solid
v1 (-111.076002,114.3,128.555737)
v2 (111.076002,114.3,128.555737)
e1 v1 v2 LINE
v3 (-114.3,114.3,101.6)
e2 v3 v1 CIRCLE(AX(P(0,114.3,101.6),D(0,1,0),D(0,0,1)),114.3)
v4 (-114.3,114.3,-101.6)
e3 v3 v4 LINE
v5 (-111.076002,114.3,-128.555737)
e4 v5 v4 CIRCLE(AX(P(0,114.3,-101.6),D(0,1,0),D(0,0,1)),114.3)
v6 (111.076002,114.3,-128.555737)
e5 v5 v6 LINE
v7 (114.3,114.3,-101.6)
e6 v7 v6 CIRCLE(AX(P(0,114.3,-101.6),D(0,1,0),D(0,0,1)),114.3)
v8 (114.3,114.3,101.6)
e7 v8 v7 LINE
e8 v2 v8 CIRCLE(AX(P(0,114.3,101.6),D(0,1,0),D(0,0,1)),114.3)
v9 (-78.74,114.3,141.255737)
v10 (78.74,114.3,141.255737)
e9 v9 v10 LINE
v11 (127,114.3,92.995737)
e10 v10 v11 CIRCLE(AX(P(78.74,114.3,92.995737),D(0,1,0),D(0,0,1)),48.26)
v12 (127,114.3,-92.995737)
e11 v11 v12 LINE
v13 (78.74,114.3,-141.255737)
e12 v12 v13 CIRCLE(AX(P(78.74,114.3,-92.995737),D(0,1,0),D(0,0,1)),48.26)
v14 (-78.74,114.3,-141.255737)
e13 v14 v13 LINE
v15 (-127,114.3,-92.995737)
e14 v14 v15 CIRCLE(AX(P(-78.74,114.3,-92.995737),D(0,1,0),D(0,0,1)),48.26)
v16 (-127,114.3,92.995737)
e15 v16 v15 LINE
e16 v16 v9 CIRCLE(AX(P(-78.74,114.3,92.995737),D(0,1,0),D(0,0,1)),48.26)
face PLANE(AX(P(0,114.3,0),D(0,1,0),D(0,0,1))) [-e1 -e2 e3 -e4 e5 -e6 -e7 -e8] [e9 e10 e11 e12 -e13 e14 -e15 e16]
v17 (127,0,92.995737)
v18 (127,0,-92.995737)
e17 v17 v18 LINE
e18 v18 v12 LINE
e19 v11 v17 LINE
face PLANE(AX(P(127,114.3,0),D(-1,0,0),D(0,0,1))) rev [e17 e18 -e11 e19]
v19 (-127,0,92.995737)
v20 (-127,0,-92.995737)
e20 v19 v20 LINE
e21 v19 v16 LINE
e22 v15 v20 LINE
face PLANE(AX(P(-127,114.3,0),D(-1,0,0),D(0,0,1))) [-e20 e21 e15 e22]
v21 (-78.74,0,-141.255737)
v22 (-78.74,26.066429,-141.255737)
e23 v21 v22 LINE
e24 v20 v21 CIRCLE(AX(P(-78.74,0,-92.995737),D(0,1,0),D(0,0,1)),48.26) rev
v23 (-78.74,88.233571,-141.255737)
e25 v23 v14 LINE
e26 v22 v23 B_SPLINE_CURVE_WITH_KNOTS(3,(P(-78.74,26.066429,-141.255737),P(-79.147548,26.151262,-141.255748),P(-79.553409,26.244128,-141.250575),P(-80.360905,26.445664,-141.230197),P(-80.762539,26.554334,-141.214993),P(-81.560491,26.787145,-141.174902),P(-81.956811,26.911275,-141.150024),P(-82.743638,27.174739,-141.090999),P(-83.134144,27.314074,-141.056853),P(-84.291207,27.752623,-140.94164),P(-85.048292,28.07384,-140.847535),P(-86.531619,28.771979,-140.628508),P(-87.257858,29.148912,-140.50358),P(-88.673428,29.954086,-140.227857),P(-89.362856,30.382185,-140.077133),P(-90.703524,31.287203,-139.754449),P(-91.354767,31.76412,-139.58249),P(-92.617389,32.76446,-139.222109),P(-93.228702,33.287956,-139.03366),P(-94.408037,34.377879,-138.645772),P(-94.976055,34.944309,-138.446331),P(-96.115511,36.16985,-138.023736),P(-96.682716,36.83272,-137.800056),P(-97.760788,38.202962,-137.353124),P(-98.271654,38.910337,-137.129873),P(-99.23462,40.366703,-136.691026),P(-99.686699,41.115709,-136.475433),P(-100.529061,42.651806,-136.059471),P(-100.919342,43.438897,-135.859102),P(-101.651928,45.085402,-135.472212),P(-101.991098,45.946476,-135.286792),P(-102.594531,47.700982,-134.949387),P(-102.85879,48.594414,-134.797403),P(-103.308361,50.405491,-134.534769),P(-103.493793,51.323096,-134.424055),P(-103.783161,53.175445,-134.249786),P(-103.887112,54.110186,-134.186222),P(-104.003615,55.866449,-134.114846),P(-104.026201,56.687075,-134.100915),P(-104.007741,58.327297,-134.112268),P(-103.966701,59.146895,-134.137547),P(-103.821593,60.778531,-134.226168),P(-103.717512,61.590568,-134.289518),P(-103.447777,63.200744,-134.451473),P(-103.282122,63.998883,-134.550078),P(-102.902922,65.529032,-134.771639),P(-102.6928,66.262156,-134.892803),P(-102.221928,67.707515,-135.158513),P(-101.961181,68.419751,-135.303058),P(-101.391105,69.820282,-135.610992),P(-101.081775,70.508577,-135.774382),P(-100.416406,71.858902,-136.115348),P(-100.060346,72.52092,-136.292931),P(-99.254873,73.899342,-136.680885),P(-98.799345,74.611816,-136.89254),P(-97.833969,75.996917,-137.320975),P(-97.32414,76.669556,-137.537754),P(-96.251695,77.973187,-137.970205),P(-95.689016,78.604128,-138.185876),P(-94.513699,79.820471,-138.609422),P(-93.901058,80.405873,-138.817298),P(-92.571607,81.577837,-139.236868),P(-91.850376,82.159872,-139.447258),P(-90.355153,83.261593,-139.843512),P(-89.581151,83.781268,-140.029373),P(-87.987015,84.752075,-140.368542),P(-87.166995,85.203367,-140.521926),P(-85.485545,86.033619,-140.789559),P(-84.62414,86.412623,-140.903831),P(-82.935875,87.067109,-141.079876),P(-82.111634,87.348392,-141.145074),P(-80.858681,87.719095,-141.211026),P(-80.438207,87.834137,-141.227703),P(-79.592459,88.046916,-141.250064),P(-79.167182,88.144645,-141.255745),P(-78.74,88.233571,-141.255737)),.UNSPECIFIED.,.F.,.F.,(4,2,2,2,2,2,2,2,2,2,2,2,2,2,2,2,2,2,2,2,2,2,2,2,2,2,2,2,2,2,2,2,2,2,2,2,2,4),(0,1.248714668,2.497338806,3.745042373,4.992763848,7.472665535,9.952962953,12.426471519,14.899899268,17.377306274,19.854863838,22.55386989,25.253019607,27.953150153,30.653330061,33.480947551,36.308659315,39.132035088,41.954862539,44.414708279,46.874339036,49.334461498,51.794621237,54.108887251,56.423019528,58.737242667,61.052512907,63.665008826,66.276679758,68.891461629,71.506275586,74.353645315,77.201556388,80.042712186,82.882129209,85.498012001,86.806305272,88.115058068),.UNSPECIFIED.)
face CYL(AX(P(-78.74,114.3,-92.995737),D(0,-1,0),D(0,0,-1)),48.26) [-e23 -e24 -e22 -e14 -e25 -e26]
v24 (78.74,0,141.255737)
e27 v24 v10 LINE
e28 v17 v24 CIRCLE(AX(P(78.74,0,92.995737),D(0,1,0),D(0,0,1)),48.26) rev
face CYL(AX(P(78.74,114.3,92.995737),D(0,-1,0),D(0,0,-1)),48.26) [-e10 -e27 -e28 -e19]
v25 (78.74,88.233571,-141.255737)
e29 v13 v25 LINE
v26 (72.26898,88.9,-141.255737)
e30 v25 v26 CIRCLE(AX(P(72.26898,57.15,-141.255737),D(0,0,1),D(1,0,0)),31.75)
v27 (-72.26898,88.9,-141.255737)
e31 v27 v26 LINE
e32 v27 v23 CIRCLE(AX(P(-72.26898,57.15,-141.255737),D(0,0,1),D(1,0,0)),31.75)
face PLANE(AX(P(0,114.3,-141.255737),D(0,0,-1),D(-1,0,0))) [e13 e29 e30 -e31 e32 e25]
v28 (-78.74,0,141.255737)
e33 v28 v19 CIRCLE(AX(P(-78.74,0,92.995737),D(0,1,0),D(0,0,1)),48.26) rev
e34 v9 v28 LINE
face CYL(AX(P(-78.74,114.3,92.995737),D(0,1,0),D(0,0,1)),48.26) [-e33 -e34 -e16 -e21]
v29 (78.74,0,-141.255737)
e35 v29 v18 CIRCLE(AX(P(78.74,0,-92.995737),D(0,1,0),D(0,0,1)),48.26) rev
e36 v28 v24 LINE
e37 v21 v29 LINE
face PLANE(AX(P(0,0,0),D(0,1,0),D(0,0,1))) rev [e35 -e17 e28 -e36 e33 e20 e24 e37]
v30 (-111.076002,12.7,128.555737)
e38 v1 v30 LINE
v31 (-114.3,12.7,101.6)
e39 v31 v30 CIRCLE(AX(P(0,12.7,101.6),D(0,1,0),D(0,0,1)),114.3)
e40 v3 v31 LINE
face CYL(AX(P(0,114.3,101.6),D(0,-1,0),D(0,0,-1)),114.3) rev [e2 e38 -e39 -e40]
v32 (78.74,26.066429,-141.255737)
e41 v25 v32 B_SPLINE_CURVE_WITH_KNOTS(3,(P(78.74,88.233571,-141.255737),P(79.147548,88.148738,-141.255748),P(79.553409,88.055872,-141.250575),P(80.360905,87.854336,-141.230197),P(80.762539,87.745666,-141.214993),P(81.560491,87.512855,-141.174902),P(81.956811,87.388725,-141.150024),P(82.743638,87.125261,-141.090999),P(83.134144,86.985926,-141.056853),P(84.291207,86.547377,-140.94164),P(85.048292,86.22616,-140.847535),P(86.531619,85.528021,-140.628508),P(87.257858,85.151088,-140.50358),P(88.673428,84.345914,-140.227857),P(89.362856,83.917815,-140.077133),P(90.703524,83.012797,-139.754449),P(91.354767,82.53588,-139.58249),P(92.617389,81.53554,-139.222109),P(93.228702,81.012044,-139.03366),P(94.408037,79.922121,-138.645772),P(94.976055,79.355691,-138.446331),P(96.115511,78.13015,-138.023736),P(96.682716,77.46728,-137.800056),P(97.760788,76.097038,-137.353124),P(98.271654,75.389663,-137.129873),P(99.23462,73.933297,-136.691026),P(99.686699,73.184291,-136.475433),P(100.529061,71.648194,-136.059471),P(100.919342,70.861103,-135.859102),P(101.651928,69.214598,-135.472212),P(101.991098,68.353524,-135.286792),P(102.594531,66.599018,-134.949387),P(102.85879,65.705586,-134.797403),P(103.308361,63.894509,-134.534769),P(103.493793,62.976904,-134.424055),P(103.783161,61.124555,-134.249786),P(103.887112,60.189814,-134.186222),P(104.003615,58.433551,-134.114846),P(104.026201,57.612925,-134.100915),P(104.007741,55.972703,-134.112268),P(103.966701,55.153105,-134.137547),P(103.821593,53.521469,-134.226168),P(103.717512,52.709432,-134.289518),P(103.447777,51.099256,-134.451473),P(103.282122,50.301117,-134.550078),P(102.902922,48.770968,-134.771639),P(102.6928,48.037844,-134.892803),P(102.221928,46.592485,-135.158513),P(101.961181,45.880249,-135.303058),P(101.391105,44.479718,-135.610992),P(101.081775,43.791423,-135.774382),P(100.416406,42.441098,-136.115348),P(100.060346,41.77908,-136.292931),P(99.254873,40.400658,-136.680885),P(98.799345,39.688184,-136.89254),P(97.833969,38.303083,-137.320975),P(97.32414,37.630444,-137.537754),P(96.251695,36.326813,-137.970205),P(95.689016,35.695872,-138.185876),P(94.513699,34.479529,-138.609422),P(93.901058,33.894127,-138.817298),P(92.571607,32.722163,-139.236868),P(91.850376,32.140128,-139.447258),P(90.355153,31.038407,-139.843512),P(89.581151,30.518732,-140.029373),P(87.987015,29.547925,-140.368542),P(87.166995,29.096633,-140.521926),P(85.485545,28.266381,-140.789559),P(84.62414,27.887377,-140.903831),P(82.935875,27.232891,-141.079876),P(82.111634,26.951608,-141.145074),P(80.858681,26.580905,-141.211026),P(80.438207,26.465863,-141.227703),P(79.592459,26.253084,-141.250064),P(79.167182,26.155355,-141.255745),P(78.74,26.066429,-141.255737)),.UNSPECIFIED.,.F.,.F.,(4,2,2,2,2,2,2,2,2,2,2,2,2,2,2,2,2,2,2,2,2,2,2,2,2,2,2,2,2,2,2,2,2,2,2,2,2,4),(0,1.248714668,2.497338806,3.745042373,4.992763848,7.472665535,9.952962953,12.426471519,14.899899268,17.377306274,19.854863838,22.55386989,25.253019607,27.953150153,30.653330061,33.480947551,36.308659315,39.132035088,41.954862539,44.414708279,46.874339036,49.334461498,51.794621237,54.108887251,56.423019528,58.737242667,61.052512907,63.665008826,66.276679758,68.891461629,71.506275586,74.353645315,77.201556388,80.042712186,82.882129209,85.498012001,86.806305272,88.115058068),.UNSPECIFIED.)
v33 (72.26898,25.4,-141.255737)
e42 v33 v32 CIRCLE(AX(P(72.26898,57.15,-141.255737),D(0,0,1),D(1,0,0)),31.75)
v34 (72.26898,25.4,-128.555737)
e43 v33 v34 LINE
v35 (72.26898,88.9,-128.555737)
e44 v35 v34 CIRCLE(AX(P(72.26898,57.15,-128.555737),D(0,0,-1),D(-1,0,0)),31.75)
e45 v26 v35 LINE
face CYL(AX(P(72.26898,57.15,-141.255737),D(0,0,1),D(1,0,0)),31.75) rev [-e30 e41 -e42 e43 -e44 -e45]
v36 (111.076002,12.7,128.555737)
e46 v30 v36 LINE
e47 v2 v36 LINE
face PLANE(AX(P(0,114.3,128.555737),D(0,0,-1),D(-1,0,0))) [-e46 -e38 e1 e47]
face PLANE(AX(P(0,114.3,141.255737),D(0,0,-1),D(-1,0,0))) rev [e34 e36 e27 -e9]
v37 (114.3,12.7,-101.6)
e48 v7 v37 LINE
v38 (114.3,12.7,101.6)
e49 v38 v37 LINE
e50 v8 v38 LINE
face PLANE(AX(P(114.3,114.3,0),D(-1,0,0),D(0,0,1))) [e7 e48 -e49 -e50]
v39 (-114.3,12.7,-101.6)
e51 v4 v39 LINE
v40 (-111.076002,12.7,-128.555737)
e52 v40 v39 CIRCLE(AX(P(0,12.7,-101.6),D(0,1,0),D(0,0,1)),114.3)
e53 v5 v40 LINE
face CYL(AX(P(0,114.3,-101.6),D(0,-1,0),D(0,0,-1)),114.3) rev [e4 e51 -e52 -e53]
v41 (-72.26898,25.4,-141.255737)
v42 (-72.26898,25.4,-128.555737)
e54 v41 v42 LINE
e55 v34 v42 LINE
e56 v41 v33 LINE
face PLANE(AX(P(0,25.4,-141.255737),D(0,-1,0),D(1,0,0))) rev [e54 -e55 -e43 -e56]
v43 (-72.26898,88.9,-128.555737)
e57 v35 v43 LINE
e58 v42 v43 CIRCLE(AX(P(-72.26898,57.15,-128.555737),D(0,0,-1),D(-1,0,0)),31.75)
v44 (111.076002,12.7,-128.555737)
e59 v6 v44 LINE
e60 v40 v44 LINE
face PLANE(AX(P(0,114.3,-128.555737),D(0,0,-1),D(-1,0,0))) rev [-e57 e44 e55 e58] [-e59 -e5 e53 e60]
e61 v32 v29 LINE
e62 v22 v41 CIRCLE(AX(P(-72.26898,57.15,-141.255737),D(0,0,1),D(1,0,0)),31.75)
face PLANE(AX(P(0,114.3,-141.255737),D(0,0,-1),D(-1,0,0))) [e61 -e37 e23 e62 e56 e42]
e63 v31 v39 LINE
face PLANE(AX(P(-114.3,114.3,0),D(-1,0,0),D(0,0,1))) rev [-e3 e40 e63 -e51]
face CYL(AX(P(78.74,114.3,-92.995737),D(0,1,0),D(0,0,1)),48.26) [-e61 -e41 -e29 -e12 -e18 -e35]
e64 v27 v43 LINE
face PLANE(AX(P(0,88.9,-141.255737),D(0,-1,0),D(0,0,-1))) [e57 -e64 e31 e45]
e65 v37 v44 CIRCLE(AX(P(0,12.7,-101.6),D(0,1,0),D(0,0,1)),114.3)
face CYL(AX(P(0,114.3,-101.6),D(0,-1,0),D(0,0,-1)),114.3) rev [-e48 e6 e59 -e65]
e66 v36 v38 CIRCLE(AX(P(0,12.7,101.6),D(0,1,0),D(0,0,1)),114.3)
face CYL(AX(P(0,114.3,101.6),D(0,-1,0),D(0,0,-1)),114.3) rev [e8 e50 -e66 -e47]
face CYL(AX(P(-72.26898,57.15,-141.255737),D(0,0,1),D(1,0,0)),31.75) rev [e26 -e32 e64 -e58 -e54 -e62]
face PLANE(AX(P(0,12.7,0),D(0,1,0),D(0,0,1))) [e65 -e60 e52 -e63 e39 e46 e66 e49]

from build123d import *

# Parameters (mm, degrees)
BOSS_EXTRUDE1_DEPTH = 114.3
SHELL1_T            = -12.7
CUT_EXTRUDE1_DEPTH  = 222.690489912
FILLET1_R           = 48.26
FILLET2_R           = 48.26


with BuildPart() as part:
    # Sketch2 → Boss-Extrude1 (new body)
    with BuildSketch(Plane(origin=(0, 0, 0), x_dir=(1, 0, 0), z_dir=(0, 1, 0))):
        with BuildLine():
            Line((-127, 101.6), (-127, -101.6))
            ThreePointArc((-127, -101.6), (-125.402452129, -121.680463142), (-120.65, -141.25573729))
            Line((-120.65, -141.25573729), (120.65, -141.25573729))
            ThreePointArc((120.65, -141.25573729), (125.402452129, -121.680463142), (127, -101.6))
            Line((127, -101.6), (127, 101.6))
            ThreePointArc((127, 101.6), (125.402452129, 121.680463142), (120.65, 141.25573729))
            Line((120.65, 141.25573729), (-120.65, 141.25573729))
            ThreePointArc((-120.65, 141.25573729), (-125.402452129, 121.680463142), (-127, 101.6))
        make_face()
    extrude(amount=BOSS_EXTRUDE1_DEPTH)

    # Shell1
    shell1_openings = [part.faces().sort_by_distance(p)[0] for p in [
        (0, 114.3, 0),
    ]]
    offset(amount=SHELL1_T, openings=shell1_openings, kind=Kind.INTERSECTION)

    # Sketch3 → Cut-Extrude1 (cut, through all)
    # profile 1 of 2: a face of its own
    with BuildSketch(Plane.XY):
        with BuildLine():
            Line((-72.268980264, 88.9), (72.268980264, 88.9))
            ThreePointArc((72.268980264, 88.9), (104.018980264, 57.15), (72.268980264, 25.4))
            Line((72.268980264, 25.4), (-72.268980264, 25.4))
            ThreePointArc((-72.268980264, 25.4), (-104.018980264, 57.15), (-72.268980264, 88.9))
        make_face()
        with BuildLine():
            ThreePointArc((72.268980264, 31.75), (97.668980264, 57.15), (72.268980264, 82.55))
            Line((72.268980264, 82.55), (-72.268980264, 82.55))
            ThreePointArc((-72.268980264, 82.55), (-97.668980264, 57.15), (-72.268980264, 31.75))
            Line((-72.268980264, 31.75), (72.268980264, 31.75))
        make_face(mode=Mode.SUBTRACT)
    # profile 2 of 2: a face of its own
    with BuildSketch(Plane.XY):
        with BuildLine():
            Line((-72.268980264, 31.75), (72.268980264, 31.75))
            ThreePointArc((72.268980264, 31.75), (97.668980264, 57.15), (72.268980264, 82.55))
            Line((72.268980264, 82.55), (-72.268980264, 82.55))
            ThreePointArc((-72.268980264, 82.55), (-97.668980264, 57.15), (-72.268980264, 31.75))
        make_face()
    extrude(amount=-CUT_EXTRUDE1_DEPTH, mode=Mode.SUBTRACT)

    # Fillet1
    fillet1_edges = [part.edges().sort_by_distance(p)[0] for p in [
        (120.65, 57.15, 141.25573729),
        (-120.65, 57.15, 141.25573729),
    ]]
    fillet(fillet1_edges, radius=FILLET1_R)

    # Fillet2
    # the kernel refuses this fillet: 48.26 mm, written as the material it takes off along each edge
    with BuildSketch(Plane(origin=(-120.65, -121.689926144, -141.25573729), x_dir=(-0.13045451257138782, 0, 0.9914542955425437), z_dir=(0, 1, 0))) as fillet2_piece_1:
        with BuildLine():
            CenterArc((42.380235681, 47.847584303), FILLET2_R, 187.49585764, 90)
            Line((-5.467348622, 41.551849526), (-10.252107052, 40.922276049))
            Line((-10.252107052, 40.922276049), (-4.78475843, -0.629573478))
            Line((-4.78475843, -0.629573478), (-0.895945537, -4.742104764))
            ThreePointArc((-0.895945537, -4.742104764), (40.774810711, -5.907223328), (49.305543935, -4.78475843))
            Line((49.305543935, -4.78475843), (48.675970458, 0))
        make_face()
    extrude(amount=357.679852289, mode=Mode.SUBTRACT)
    with BuildSketch(Plane(origin=(120.65, -121.689926144, -141.25573729), x_dir=(-1, 0, 0), z_dir=(0, 1, 0))) as fillet2_piece_2:
        with BuildLine():
            CenterArc((41.91, 48.26), FILLET2_R, 180, 90)
            Line((-6.35, 48.26), (-11.176, 48.26))
            ThreePointArc((-11.176, 48.26), (-11.176, 39.65573729), (-4.5847, -1.506918017))
            Line((-4.5847, -1.506918017), (0, -4.826))
            Line((0, -4.826), (41.91, -4.826))
            Line((41.91, -4.826), (41.91, 0))
        make_face()
    extrude(amount=357.679852289, mode=Mode.SUBTRACT)


solid = part.part
